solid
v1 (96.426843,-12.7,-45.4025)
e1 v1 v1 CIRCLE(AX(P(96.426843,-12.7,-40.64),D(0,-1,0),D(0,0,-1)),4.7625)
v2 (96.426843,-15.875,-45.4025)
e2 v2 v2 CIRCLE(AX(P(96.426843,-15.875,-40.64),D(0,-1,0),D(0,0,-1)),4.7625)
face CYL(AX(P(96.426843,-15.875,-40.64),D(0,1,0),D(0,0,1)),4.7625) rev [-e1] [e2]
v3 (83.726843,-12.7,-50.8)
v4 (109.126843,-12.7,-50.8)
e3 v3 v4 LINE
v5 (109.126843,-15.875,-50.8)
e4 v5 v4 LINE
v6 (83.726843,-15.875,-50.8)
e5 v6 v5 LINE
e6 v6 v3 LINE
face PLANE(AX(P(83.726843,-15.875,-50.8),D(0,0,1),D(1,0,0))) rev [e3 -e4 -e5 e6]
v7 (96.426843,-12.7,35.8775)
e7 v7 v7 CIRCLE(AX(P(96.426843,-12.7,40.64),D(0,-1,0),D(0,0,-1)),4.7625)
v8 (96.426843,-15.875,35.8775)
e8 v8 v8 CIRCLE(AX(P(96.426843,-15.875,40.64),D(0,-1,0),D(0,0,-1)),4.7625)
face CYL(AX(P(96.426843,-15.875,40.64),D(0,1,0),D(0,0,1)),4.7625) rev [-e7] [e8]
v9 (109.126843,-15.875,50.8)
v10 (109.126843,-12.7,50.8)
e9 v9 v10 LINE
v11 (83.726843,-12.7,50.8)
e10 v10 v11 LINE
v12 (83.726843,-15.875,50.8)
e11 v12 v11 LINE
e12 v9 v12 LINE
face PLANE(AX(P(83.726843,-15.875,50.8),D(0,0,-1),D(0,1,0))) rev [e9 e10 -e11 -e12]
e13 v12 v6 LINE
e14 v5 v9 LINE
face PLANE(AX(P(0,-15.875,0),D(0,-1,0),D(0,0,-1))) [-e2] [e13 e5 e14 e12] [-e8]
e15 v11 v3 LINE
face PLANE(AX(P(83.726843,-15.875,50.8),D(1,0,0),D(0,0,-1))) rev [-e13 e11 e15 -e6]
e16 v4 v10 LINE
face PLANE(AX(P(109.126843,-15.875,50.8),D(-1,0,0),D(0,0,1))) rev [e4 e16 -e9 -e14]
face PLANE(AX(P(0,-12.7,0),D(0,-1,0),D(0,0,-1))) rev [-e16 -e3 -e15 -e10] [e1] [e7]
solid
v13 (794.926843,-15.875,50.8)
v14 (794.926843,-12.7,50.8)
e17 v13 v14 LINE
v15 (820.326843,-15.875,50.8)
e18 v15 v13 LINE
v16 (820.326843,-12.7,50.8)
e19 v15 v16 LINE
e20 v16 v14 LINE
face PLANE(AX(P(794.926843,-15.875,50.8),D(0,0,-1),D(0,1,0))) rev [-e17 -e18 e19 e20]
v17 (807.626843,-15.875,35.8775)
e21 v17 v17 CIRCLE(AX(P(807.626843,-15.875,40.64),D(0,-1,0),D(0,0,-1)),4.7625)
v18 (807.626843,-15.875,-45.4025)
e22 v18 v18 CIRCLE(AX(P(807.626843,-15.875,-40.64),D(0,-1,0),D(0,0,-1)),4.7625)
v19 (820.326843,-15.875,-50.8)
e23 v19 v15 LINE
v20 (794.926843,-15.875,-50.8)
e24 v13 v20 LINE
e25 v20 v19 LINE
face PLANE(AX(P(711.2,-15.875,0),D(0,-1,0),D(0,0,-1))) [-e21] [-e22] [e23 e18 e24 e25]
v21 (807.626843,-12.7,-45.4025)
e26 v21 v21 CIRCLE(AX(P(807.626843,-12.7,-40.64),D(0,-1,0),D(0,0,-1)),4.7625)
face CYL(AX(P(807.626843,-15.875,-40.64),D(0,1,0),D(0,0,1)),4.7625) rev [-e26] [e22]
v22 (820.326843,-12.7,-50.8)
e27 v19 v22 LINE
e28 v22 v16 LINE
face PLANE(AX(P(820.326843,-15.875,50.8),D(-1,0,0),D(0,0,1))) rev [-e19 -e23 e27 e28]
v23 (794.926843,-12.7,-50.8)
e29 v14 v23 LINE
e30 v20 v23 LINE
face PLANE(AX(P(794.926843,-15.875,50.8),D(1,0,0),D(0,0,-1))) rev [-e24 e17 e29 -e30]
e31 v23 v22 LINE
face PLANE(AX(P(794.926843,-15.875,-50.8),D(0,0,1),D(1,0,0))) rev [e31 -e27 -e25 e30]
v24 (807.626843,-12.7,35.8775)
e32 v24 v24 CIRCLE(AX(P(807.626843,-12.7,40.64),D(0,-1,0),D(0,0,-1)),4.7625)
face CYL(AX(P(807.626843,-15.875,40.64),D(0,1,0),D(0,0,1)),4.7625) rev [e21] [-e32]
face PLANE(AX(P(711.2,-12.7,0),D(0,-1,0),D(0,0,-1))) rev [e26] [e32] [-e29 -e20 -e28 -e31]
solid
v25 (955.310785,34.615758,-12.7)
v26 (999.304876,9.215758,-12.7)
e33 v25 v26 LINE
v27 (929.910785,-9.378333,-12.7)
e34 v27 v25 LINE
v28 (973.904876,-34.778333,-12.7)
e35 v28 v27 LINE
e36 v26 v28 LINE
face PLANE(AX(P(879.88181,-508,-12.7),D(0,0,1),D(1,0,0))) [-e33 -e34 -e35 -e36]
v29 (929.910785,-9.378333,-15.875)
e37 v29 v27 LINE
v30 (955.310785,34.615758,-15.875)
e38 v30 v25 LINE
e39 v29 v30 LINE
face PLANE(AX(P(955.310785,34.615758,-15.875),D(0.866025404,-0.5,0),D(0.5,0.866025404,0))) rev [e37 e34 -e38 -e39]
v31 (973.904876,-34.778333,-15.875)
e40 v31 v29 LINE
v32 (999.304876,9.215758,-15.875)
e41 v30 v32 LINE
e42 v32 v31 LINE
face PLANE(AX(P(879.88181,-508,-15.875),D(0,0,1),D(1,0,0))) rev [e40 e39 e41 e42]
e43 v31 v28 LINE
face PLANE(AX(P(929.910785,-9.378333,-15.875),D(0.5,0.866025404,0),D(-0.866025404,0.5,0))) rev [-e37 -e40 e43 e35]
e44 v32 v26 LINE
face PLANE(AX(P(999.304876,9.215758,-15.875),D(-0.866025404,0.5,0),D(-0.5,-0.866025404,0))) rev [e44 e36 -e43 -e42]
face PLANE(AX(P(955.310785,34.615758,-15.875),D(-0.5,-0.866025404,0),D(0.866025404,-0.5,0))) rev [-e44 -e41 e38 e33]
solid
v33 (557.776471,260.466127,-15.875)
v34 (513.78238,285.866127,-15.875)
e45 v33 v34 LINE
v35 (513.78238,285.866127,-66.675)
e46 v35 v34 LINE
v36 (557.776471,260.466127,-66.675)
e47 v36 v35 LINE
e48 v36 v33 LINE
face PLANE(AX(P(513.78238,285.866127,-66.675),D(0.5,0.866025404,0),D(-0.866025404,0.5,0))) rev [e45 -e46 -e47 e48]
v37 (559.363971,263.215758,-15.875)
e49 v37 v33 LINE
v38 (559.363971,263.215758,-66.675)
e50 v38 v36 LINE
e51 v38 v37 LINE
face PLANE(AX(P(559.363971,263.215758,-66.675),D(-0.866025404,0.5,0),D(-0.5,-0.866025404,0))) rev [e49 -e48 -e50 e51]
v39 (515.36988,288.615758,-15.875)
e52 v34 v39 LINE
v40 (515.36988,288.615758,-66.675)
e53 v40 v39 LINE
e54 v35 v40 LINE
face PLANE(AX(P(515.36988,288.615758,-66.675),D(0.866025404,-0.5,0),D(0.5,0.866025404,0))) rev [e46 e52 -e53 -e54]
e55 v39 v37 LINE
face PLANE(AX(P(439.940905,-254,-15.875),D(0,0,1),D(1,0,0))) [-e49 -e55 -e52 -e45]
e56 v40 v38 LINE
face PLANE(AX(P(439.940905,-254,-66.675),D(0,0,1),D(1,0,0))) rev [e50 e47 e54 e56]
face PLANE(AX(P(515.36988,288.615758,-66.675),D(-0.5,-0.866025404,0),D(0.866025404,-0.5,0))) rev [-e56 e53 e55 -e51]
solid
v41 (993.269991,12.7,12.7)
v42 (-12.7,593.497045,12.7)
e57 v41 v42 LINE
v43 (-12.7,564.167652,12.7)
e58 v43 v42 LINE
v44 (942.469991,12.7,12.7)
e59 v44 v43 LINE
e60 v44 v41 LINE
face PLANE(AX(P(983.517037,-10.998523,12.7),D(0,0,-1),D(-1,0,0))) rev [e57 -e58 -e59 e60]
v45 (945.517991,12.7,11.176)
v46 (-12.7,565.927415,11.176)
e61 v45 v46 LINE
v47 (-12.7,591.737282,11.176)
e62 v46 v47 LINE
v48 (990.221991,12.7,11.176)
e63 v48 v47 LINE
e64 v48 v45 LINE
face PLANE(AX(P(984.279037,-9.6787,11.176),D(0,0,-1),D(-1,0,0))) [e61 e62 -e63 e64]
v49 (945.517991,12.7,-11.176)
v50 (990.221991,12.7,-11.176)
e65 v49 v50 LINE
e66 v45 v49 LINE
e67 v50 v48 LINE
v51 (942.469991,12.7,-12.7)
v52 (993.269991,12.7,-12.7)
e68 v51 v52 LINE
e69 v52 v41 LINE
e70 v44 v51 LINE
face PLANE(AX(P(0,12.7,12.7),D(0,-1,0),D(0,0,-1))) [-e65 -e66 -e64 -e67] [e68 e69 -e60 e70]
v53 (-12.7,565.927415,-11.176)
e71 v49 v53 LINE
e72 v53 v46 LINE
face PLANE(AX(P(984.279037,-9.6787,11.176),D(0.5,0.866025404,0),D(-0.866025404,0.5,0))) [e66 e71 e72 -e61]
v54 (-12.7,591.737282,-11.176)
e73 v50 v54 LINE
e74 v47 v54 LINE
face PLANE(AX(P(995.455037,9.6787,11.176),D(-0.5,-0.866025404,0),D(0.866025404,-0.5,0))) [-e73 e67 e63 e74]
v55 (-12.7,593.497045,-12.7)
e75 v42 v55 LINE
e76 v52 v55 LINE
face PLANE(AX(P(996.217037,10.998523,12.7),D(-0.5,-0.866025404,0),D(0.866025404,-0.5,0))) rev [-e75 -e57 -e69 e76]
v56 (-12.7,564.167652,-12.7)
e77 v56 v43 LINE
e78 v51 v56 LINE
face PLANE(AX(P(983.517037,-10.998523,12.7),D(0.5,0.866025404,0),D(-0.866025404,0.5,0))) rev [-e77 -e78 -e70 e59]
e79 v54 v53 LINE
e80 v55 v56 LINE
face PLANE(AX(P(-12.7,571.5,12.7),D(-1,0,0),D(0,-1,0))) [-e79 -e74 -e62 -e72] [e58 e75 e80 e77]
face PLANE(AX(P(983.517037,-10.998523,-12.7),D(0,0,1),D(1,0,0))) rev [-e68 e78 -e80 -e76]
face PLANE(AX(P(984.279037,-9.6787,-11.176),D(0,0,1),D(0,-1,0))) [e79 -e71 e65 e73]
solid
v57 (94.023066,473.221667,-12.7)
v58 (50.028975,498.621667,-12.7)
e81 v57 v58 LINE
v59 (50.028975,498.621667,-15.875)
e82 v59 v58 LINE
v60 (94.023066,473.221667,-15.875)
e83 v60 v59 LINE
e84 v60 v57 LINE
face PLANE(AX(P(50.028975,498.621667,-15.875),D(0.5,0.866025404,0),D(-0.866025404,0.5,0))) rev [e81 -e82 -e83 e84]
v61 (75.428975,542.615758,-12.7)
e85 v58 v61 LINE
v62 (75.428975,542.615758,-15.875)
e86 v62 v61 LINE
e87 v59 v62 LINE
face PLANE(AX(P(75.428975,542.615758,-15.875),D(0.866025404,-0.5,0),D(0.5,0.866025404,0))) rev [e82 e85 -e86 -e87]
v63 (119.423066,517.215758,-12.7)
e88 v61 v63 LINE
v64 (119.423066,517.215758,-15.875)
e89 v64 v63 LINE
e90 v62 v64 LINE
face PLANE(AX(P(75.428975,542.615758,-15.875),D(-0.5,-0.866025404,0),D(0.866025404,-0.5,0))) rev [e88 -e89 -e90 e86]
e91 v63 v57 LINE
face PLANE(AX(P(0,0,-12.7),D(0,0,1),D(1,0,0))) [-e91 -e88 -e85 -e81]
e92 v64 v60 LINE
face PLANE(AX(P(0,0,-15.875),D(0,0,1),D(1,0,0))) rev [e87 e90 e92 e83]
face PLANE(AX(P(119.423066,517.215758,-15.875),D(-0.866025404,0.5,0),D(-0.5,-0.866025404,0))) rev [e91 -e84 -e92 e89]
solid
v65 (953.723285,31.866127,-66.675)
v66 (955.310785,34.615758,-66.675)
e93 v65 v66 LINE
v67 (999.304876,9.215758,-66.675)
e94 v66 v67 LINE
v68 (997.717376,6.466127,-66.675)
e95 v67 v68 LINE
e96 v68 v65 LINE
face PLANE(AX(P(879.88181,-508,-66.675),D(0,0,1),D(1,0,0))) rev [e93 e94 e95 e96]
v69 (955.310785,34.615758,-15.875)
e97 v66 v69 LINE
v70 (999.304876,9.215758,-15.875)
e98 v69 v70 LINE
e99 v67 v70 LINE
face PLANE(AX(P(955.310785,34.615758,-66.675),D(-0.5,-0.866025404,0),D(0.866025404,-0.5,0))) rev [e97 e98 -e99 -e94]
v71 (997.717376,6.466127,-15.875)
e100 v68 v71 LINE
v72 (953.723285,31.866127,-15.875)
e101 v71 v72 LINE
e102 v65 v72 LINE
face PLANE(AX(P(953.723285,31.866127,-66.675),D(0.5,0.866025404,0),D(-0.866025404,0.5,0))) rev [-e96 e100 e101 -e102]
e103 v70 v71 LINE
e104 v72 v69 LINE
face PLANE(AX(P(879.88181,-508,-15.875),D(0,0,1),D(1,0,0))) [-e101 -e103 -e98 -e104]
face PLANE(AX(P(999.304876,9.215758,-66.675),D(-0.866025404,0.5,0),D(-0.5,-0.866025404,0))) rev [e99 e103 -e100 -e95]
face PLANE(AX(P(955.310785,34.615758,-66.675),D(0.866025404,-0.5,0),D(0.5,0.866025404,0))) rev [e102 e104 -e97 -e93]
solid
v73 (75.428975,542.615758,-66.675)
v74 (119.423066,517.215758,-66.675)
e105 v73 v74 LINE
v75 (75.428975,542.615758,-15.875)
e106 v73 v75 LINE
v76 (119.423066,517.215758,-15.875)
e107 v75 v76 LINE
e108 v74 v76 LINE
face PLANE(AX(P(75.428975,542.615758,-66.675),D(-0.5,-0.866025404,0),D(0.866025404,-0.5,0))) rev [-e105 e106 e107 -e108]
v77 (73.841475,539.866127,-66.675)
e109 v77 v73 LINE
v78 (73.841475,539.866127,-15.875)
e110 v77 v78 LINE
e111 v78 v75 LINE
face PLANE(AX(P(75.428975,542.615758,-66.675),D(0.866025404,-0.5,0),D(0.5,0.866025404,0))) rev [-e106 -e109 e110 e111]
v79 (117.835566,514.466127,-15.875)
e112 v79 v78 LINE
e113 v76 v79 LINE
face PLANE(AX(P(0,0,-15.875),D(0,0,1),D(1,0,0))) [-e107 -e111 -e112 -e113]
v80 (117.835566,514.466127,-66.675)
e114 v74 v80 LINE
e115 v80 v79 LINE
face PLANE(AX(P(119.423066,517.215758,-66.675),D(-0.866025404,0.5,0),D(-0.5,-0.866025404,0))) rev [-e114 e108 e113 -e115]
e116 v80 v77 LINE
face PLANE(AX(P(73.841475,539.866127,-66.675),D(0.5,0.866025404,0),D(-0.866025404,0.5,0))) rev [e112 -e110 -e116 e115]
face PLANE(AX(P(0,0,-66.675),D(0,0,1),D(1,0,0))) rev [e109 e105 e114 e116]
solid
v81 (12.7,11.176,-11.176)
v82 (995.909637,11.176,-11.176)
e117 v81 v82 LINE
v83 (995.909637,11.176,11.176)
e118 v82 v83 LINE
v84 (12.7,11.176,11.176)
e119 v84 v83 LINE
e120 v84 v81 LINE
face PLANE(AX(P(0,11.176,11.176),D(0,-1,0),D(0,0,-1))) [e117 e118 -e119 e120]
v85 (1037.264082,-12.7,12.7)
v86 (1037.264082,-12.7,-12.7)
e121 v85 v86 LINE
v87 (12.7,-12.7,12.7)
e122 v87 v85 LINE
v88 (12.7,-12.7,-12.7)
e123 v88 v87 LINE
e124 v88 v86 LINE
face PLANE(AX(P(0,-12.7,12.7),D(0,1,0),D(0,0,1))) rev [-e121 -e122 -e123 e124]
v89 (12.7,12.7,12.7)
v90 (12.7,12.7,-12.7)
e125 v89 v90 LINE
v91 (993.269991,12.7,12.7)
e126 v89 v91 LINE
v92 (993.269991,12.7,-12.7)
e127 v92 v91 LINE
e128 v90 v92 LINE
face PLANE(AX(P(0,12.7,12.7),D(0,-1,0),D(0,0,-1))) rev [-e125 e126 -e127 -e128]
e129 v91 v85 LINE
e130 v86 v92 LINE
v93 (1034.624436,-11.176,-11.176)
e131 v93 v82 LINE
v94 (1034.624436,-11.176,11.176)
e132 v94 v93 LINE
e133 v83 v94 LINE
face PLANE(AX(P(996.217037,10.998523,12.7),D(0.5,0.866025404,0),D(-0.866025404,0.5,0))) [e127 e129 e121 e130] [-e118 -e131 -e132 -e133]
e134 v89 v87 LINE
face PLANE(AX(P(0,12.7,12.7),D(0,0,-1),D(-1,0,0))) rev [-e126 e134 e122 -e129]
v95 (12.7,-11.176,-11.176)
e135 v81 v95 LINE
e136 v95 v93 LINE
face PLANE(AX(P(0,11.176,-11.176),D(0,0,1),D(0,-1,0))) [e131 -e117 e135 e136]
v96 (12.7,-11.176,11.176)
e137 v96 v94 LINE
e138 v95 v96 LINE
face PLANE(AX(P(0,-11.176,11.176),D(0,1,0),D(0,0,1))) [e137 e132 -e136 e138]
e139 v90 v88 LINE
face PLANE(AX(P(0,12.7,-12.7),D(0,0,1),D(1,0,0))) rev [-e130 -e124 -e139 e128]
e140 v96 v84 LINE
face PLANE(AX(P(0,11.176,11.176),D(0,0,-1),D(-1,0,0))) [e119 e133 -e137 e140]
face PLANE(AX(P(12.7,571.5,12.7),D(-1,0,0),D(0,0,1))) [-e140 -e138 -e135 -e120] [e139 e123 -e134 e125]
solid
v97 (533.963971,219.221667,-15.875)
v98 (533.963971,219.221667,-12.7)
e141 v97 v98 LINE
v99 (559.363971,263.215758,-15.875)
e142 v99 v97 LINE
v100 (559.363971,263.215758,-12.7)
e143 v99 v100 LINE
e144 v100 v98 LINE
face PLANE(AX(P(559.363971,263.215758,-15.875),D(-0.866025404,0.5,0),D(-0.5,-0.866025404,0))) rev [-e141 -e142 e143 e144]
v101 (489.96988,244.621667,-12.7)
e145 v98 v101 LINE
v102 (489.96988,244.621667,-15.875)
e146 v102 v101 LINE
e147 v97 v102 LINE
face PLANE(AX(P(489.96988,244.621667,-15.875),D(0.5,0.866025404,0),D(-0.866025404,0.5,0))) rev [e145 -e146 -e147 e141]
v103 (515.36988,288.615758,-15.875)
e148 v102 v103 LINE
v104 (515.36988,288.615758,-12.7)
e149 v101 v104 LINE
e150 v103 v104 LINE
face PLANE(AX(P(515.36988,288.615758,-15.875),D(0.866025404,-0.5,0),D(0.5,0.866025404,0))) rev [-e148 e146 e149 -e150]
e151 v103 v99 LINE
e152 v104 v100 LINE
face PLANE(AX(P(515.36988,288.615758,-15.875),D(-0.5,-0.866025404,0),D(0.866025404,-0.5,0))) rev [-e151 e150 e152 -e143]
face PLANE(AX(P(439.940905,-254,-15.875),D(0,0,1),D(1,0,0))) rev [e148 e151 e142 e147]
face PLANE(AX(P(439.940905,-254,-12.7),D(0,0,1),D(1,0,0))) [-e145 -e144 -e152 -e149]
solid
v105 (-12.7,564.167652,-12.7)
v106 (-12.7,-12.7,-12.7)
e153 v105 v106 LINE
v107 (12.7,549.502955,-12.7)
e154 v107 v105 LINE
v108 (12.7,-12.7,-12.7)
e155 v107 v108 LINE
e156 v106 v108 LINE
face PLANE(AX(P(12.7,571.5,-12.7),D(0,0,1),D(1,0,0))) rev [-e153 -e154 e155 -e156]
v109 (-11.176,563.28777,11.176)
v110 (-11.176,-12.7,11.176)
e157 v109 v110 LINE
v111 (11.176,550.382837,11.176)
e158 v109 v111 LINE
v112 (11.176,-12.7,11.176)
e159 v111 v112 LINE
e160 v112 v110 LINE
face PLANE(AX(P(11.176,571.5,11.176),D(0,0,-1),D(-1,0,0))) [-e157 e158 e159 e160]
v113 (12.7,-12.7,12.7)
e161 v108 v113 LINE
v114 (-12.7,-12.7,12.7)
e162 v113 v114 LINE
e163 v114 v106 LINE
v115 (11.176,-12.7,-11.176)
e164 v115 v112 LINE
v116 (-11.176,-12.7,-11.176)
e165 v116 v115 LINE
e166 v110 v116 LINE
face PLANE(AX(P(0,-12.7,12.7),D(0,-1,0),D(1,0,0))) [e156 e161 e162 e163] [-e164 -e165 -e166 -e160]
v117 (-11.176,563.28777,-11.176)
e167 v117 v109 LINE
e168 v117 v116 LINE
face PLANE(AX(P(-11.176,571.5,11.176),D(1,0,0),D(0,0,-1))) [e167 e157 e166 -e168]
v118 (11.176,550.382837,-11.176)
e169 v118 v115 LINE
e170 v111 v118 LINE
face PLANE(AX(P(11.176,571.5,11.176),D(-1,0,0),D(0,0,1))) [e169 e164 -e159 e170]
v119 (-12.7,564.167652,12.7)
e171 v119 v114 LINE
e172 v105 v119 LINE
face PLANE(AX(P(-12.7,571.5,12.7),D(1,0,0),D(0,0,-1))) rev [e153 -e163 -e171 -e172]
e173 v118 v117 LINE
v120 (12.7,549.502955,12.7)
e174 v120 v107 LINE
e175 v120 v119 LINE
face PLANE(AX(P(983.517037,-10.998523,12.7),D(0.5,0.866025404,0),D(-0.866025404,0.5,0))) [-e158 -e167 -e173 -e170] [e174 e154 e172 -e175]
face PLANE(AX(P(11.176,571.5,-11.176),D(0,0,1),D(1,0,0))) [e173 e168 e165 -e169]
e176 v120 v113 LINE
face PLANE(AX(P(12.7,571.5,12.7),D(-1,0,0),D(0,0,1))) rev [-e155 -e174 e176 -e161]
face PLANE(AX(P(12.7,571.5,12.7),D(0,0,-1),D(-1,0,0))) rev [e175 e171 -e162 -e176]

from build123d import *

# Parameters (mm, degrees)
RECTANGULAR_START                    = -12.7
RECTANGULAR_TUBE_1X1X0_060_1_DEPTH   = 25.4
RECTANGULAR_TUBE_1X1X0_060_1_2_DEPTH = 1.524
RECTANGULAR_START_2                  = 11.176
RECTANGULAR_TUBE_1X1X0_060_1_3_DEPTH = 1.524
RECTANGULAR_TUBE_1X1X0_060_1_4_DEPTH = 25.4
RECTANGULAR_TUBE_1X1X0_060_1_5_DEPTH = 1.524
RECTANGULAR_TUBE_1X1X0_060_1_6_DEPTH = 1.524
RECTANGULAR_TUBE_1X1X0_060_1_7_DEPTH = 25.4
RECTANGULAR_TUBE_1X1X0_060_1_8_DEPTH = 1.524
RECTANGULAR_TUBE_1X1X0_060_1_9_DEPTH = 1.524
SKETCH3_W                            = 25.4
SKETCH3_H                            = 101.6
SKETCH3_R                            = 4.7625
BOSS_EXTRUDE1_DEPTH                  = 3.175
LPATTERN1_COUNT                      = 2
LPATTERN1_PITCH                      = 711.2
BOSS_EXTRUDE2_DEPTH                  = 3.175
BOSS_EXTRUDE3_DEPTH                  = 50.8
LPATTERN2_START                      = 810.015529895
LPATTERN2_OUTLINE_W                  = 3.175
LPATTERN2_OUTLINE_H                  = 50.8
LPATTERN2_DEPTH                      = 50.8
LPATTERN2_START_2                    = 302.015529895
LPATTERN2_2_OUTLINE_W                = 3.175
LPATTERN2_2_OUTLINE_H                = 50.8
LPATTERN2_2_DEPTH                    = 50.8
LPATTERN2_3_OUTLINE_W                = 50.8
LPATTERN2_3_OUTLINE_H                = 3.175
LPATTERN2_3_DEPTH                    = 50.8
LPATTERN2_4_OUTLINE_W                = 50.8
LPATTERN2_4_OUTLINE_H                = 3.175
LPATTERN2_4_DEPTH                    = 50.8


# Read off the part's stored shape, not the designer's step: Rectangular tube 1X1X0_060(1), LPattern2
with BuildPart() as part:
    # Rectangular tube 1X1X0_060(1) outline → Rectangular tube 1X1X0_060(1) (new body)
    with BuildSketch(Plane.XY.offset(RECTANGULAR_START)):
        Polygon((942.469991269, 12.7), (945.517991269, 12.7), (-12.7, 565.927415202), (-12.7, 564.167651581), align=None)
        Polygon((-12.7, 591.737281636), (990.221991269, 12.7), (993.269991269, 12.7), (-12.7, 593.497045256), align=None)
    extrude(amount=RECTANGULAR_TUBE_1X1X0_060_1_DEPTH)

    # Rectangular tube 1X1X0_060_1 2 outline → Rectangular tube 1X1X0_060_1 2 (add)
    with BuildSketch(Plane.XY.offset(RECTANGULAR_START)):
        Polygon((-12.7, 565.927415202), (945.517991269, 12.7), (990.221991269, 12.7), (-12.7, 591.737281636), align=None)
    extrude(amount=RECTANGULAR_TUBE_1X1X0_060_1_2_DEPTH)

    # Rectangular tube 1X1X0_060_1 3 outline → Rectangular tube 1X1X0_060_1 3 (add)
    with BuildSketch(Plane.XY.offset(RECTANGULAR_START_2)):
        Polygon((-12.7, 565.927415202), (945.517991269, 12.7), (990.221991269, 12.7), (-12.7, 591.737281636), align=None)
    extrude(amount=RECTANGULAR_TUBE_1X1X0_060_1_3_DEPTH)


with BuildPart() as body_2:
    # Rectangular tube 1X1X0_060_1 4 outline → Rectangular tube 1X1X0_060_1 4 (new body)
    with BuildSketch(Plane.XY.offset(RECTANGULAR_START)):
        Polygon((12.7, 549.502954744), (11.176, 550.382836554), (11.176, -12.7), (12.7, -12.7), align=None)
        Polygon((-11.176, -12.7), (-11.176, 563.287769771), (-12.7, 564.167651581), (-12.7, -12.7), align=None)
    extrude(amount=RECTANGULAR_TUBE_1X1X0_060_1_4_DEPTH)

    # Rectangular tube 1X1X0_060_1 5 outline → Rectangular tube 1X1X0_060_1 5 (add)
    with BuildSketch(Plane.XY.offset(RECTANGULAR_START)):
        Polygon((11.176, -12.7), (11.176, 550.382836554), (-11.176, 563.287769771), (-11.176, -12.7), align=None)
    extrude(amount=RECTANGULAR_TUBE_1X1X0_060_1_5_DEPTH)

    # Rectangular tube 1X1X0_060_1 6 outline → Rectangular tube 1X1X0_060_1 6 (add)
    with BuildSketch(Plane.XY.offset(RECTANGULAR_START_2)):
        Polygon((11.176, -12.7), (11.176, 550.382836554), (-11.176, 563.287769771), (-11.176, -12.7), align=None)
    extrude(amount=RECTANGULAR_TUBE_1X1X0_060_1_6_DEPTH)


with BuildPart() as body_3:
    # Rectangular tube 1X1X0_060_1 7 outline → Rectangular tube 1X1X0_060_1 7 (new body)
    with BuildSketch(Plane.XY.offset(RECTANGULAR_START)):
        Polygon((12.7, 12.7), (12.7, 11.176), (995.9096367, 11.176), (993.269991269, 12.7), align=None)
        Polygon((1034.624436351, -11.176), (12.7, -11.176), (12.7, -12.7), (1037.264081782, -12.7), align=None)
    extrude(amount=RECTANGULAR_TUBE_1X1X0_060_1_7_DEPTH)

    # Rectangular tube 1X1X0_060_1 8 outline → Rectangular tube 1X1X0_060_1 8 (add)
    with BuildSketch(Plane.XY.offset(RECTANGULAR_START)):
        Polygon((995.9096367, 11.176), (12.7, 11.176), (12.7, -11.176), (1034.624436351, -11.176), align=None)
    extrude(amount=RECTANGULAR_TUBE_1X1X0_060_1_8_DEPTH)

    # Rectangular tube 1X1X0_060_1 9 outline → Rectangular tube 1X1X0_060_1 9 (add)
    with BuildSketch(Plane.XY.offset(RECTANGULAR_START_2)):
        Polygon((995.9096367, 11.176), (12.7, 11.176), (12.7, -11.176), (1034.624436351, -11.176), align=None)
    extrude(amount=RECTANGULAR_TUBE_1X1X0_060_1_9_DEPTH)


with BuildPart() as body_4:
    # Sketch3 → Boss-Extrude1 (new body)
    with BuildSketch(Plane.XZ.offset(12.7)):
        with Locations((96.426843049, 0)):
            Rectangle(SKETCH3_W, SKETCH3_H)
        with Locations(Location((96.426843049, 40.64, 0), (0, 0, 270))):
            Circle(SKETCH3_R, mode=Mode.SUBTRACT)
        with Locations(Location((96.426843049, -40.64, 0), (0, 0, 270))):
            Circle(SKETCH3_R, mode=Mode.SUBTRACT)
    boss_extrude1 = extrude(amount=BOSS_EXTRUDE1_DEPTH)


with BuildPart() as lpattern1_1:
    # LPattern1: Boss-Extrude1 ×2
    with Locations(*[(i * LPATTERN1_PITCH, 0, 0) for i in range(1, LPATTERN1_COUNT)]):
        add(boss_extrude1)


with BuildPart() as body_6:
    # Sketch5 → Boss-Extrude2 (new body)
    with BuildSketch(Plane(origin=(0, 0, -12.7), x_dir=(-1, 0, 0), z_dir=(0, 0, -1))):
        Polygon((-75.428975235, 542.615757681), (-119.423065748, 517.215757681), (-94.023065748, 473.221667168), (-50.028975235, 498.621667168), align=None)
    extrude(amount=BOSS_EXTRUDE2_DEPTH)


with BuildPart() as body_7:
    # Sketch6 → Boss-Extrude3 (new body)
    with BuildSketch(Plane(origin=(0, 0, -15.875), x_dir=(-1, 0, 0), z_dir=(0, 0, -1))):
        Polygon((-75.428975235, 542.615757681), (-119.423065748, 517.215757681), (-117.835565748, 514.466127024), (-73.841475235, 539.866127024), align=None)
    extrude(amount=BOSS_EXTRUDE3_DEPTH)


with BuildPart() as body_8:
    # LPattern2 outline → LPattern2 (new body)
    with BuildSketch(Plane(origin=(0, 0, 0), x_dir=(0.500000000000108, 0.8660254037843762, 0), z_dir=(0.8660254037843762, -0.5000000000001082, 0)).offset(LPATTERN2_START)):
        with Locations((506.046018263, -41.275)):
            Rectangle(LPATTERN2_OUTLINE_W, LPATTERN2_OUTLINE_H)
    extrude(amount=LPATTERN2_DEPTH)


with BuildPart() as body_9:
    # LPattern2 2 outline → LPattern2 2 (new body)
    with BuildSketch(Plane(origin=(0, 0, 0), x_dir=(0.500000000000108, 0.8660254037843762, 0), z_dir=(0.8660254037843762, -0.5000000000001082, 0)).offset(LPATTERN2_START_2)):
        with Locations((506.046018263, -41.275)):
            Rectangle(LPATTERN2_2_OUTLINE_W, LPATTERN2_2_OUTLINE_H)
    extrude(amount=LPATTERN2_2_DEPTH)


with BuildPart() as body_10:
    # LPattern2 3 outline → LPattern2 3 (new body)
    with BuildSketch(Plane(origin=(0, 0, 0), x_dir=(0.5000000000000003, 0.8660254037844385, 0), z_dir=(0.8660254037844385, -0.5000000000000003, 0)).offset(LPATTERN2_START)):
        with Locations((482.233518263, -14.2875)):
            Rectangle(LPATTERN2_3_OUTLINE_W, LPATTERN2_3_OUTLINE_H)
    extrude(amount=LPATTERN2_3_DEPTH)


with BuildPart() as body_11:
    # LPattern2 4 outline → LPattern2 4 (new body)
    with BuildSketch(Plane(origin=(0, 0, 0), x_dir=(0.5000000000000003, 0.8660254037844385, 0), z_dir=(0.8660254037844385, -0.5000000000000003, 0)).offset(LPATTERN2_START_2)):
        with Locations((482.233518263, -14.2875)):
            Rectangle(LPATTERN2_4_OUTLINE_W, LPATTERN2_4_OUTLINE_H)
    extrude(amount=LPATTERN2_4_DEPTH)


solid = Compound([part.part, body_2.part, body_3.part, body_4.part, lpattern1_1.part, body_6.part, body_7.part, body_8.part, body_9.part, body_10.part, body_11.part])
